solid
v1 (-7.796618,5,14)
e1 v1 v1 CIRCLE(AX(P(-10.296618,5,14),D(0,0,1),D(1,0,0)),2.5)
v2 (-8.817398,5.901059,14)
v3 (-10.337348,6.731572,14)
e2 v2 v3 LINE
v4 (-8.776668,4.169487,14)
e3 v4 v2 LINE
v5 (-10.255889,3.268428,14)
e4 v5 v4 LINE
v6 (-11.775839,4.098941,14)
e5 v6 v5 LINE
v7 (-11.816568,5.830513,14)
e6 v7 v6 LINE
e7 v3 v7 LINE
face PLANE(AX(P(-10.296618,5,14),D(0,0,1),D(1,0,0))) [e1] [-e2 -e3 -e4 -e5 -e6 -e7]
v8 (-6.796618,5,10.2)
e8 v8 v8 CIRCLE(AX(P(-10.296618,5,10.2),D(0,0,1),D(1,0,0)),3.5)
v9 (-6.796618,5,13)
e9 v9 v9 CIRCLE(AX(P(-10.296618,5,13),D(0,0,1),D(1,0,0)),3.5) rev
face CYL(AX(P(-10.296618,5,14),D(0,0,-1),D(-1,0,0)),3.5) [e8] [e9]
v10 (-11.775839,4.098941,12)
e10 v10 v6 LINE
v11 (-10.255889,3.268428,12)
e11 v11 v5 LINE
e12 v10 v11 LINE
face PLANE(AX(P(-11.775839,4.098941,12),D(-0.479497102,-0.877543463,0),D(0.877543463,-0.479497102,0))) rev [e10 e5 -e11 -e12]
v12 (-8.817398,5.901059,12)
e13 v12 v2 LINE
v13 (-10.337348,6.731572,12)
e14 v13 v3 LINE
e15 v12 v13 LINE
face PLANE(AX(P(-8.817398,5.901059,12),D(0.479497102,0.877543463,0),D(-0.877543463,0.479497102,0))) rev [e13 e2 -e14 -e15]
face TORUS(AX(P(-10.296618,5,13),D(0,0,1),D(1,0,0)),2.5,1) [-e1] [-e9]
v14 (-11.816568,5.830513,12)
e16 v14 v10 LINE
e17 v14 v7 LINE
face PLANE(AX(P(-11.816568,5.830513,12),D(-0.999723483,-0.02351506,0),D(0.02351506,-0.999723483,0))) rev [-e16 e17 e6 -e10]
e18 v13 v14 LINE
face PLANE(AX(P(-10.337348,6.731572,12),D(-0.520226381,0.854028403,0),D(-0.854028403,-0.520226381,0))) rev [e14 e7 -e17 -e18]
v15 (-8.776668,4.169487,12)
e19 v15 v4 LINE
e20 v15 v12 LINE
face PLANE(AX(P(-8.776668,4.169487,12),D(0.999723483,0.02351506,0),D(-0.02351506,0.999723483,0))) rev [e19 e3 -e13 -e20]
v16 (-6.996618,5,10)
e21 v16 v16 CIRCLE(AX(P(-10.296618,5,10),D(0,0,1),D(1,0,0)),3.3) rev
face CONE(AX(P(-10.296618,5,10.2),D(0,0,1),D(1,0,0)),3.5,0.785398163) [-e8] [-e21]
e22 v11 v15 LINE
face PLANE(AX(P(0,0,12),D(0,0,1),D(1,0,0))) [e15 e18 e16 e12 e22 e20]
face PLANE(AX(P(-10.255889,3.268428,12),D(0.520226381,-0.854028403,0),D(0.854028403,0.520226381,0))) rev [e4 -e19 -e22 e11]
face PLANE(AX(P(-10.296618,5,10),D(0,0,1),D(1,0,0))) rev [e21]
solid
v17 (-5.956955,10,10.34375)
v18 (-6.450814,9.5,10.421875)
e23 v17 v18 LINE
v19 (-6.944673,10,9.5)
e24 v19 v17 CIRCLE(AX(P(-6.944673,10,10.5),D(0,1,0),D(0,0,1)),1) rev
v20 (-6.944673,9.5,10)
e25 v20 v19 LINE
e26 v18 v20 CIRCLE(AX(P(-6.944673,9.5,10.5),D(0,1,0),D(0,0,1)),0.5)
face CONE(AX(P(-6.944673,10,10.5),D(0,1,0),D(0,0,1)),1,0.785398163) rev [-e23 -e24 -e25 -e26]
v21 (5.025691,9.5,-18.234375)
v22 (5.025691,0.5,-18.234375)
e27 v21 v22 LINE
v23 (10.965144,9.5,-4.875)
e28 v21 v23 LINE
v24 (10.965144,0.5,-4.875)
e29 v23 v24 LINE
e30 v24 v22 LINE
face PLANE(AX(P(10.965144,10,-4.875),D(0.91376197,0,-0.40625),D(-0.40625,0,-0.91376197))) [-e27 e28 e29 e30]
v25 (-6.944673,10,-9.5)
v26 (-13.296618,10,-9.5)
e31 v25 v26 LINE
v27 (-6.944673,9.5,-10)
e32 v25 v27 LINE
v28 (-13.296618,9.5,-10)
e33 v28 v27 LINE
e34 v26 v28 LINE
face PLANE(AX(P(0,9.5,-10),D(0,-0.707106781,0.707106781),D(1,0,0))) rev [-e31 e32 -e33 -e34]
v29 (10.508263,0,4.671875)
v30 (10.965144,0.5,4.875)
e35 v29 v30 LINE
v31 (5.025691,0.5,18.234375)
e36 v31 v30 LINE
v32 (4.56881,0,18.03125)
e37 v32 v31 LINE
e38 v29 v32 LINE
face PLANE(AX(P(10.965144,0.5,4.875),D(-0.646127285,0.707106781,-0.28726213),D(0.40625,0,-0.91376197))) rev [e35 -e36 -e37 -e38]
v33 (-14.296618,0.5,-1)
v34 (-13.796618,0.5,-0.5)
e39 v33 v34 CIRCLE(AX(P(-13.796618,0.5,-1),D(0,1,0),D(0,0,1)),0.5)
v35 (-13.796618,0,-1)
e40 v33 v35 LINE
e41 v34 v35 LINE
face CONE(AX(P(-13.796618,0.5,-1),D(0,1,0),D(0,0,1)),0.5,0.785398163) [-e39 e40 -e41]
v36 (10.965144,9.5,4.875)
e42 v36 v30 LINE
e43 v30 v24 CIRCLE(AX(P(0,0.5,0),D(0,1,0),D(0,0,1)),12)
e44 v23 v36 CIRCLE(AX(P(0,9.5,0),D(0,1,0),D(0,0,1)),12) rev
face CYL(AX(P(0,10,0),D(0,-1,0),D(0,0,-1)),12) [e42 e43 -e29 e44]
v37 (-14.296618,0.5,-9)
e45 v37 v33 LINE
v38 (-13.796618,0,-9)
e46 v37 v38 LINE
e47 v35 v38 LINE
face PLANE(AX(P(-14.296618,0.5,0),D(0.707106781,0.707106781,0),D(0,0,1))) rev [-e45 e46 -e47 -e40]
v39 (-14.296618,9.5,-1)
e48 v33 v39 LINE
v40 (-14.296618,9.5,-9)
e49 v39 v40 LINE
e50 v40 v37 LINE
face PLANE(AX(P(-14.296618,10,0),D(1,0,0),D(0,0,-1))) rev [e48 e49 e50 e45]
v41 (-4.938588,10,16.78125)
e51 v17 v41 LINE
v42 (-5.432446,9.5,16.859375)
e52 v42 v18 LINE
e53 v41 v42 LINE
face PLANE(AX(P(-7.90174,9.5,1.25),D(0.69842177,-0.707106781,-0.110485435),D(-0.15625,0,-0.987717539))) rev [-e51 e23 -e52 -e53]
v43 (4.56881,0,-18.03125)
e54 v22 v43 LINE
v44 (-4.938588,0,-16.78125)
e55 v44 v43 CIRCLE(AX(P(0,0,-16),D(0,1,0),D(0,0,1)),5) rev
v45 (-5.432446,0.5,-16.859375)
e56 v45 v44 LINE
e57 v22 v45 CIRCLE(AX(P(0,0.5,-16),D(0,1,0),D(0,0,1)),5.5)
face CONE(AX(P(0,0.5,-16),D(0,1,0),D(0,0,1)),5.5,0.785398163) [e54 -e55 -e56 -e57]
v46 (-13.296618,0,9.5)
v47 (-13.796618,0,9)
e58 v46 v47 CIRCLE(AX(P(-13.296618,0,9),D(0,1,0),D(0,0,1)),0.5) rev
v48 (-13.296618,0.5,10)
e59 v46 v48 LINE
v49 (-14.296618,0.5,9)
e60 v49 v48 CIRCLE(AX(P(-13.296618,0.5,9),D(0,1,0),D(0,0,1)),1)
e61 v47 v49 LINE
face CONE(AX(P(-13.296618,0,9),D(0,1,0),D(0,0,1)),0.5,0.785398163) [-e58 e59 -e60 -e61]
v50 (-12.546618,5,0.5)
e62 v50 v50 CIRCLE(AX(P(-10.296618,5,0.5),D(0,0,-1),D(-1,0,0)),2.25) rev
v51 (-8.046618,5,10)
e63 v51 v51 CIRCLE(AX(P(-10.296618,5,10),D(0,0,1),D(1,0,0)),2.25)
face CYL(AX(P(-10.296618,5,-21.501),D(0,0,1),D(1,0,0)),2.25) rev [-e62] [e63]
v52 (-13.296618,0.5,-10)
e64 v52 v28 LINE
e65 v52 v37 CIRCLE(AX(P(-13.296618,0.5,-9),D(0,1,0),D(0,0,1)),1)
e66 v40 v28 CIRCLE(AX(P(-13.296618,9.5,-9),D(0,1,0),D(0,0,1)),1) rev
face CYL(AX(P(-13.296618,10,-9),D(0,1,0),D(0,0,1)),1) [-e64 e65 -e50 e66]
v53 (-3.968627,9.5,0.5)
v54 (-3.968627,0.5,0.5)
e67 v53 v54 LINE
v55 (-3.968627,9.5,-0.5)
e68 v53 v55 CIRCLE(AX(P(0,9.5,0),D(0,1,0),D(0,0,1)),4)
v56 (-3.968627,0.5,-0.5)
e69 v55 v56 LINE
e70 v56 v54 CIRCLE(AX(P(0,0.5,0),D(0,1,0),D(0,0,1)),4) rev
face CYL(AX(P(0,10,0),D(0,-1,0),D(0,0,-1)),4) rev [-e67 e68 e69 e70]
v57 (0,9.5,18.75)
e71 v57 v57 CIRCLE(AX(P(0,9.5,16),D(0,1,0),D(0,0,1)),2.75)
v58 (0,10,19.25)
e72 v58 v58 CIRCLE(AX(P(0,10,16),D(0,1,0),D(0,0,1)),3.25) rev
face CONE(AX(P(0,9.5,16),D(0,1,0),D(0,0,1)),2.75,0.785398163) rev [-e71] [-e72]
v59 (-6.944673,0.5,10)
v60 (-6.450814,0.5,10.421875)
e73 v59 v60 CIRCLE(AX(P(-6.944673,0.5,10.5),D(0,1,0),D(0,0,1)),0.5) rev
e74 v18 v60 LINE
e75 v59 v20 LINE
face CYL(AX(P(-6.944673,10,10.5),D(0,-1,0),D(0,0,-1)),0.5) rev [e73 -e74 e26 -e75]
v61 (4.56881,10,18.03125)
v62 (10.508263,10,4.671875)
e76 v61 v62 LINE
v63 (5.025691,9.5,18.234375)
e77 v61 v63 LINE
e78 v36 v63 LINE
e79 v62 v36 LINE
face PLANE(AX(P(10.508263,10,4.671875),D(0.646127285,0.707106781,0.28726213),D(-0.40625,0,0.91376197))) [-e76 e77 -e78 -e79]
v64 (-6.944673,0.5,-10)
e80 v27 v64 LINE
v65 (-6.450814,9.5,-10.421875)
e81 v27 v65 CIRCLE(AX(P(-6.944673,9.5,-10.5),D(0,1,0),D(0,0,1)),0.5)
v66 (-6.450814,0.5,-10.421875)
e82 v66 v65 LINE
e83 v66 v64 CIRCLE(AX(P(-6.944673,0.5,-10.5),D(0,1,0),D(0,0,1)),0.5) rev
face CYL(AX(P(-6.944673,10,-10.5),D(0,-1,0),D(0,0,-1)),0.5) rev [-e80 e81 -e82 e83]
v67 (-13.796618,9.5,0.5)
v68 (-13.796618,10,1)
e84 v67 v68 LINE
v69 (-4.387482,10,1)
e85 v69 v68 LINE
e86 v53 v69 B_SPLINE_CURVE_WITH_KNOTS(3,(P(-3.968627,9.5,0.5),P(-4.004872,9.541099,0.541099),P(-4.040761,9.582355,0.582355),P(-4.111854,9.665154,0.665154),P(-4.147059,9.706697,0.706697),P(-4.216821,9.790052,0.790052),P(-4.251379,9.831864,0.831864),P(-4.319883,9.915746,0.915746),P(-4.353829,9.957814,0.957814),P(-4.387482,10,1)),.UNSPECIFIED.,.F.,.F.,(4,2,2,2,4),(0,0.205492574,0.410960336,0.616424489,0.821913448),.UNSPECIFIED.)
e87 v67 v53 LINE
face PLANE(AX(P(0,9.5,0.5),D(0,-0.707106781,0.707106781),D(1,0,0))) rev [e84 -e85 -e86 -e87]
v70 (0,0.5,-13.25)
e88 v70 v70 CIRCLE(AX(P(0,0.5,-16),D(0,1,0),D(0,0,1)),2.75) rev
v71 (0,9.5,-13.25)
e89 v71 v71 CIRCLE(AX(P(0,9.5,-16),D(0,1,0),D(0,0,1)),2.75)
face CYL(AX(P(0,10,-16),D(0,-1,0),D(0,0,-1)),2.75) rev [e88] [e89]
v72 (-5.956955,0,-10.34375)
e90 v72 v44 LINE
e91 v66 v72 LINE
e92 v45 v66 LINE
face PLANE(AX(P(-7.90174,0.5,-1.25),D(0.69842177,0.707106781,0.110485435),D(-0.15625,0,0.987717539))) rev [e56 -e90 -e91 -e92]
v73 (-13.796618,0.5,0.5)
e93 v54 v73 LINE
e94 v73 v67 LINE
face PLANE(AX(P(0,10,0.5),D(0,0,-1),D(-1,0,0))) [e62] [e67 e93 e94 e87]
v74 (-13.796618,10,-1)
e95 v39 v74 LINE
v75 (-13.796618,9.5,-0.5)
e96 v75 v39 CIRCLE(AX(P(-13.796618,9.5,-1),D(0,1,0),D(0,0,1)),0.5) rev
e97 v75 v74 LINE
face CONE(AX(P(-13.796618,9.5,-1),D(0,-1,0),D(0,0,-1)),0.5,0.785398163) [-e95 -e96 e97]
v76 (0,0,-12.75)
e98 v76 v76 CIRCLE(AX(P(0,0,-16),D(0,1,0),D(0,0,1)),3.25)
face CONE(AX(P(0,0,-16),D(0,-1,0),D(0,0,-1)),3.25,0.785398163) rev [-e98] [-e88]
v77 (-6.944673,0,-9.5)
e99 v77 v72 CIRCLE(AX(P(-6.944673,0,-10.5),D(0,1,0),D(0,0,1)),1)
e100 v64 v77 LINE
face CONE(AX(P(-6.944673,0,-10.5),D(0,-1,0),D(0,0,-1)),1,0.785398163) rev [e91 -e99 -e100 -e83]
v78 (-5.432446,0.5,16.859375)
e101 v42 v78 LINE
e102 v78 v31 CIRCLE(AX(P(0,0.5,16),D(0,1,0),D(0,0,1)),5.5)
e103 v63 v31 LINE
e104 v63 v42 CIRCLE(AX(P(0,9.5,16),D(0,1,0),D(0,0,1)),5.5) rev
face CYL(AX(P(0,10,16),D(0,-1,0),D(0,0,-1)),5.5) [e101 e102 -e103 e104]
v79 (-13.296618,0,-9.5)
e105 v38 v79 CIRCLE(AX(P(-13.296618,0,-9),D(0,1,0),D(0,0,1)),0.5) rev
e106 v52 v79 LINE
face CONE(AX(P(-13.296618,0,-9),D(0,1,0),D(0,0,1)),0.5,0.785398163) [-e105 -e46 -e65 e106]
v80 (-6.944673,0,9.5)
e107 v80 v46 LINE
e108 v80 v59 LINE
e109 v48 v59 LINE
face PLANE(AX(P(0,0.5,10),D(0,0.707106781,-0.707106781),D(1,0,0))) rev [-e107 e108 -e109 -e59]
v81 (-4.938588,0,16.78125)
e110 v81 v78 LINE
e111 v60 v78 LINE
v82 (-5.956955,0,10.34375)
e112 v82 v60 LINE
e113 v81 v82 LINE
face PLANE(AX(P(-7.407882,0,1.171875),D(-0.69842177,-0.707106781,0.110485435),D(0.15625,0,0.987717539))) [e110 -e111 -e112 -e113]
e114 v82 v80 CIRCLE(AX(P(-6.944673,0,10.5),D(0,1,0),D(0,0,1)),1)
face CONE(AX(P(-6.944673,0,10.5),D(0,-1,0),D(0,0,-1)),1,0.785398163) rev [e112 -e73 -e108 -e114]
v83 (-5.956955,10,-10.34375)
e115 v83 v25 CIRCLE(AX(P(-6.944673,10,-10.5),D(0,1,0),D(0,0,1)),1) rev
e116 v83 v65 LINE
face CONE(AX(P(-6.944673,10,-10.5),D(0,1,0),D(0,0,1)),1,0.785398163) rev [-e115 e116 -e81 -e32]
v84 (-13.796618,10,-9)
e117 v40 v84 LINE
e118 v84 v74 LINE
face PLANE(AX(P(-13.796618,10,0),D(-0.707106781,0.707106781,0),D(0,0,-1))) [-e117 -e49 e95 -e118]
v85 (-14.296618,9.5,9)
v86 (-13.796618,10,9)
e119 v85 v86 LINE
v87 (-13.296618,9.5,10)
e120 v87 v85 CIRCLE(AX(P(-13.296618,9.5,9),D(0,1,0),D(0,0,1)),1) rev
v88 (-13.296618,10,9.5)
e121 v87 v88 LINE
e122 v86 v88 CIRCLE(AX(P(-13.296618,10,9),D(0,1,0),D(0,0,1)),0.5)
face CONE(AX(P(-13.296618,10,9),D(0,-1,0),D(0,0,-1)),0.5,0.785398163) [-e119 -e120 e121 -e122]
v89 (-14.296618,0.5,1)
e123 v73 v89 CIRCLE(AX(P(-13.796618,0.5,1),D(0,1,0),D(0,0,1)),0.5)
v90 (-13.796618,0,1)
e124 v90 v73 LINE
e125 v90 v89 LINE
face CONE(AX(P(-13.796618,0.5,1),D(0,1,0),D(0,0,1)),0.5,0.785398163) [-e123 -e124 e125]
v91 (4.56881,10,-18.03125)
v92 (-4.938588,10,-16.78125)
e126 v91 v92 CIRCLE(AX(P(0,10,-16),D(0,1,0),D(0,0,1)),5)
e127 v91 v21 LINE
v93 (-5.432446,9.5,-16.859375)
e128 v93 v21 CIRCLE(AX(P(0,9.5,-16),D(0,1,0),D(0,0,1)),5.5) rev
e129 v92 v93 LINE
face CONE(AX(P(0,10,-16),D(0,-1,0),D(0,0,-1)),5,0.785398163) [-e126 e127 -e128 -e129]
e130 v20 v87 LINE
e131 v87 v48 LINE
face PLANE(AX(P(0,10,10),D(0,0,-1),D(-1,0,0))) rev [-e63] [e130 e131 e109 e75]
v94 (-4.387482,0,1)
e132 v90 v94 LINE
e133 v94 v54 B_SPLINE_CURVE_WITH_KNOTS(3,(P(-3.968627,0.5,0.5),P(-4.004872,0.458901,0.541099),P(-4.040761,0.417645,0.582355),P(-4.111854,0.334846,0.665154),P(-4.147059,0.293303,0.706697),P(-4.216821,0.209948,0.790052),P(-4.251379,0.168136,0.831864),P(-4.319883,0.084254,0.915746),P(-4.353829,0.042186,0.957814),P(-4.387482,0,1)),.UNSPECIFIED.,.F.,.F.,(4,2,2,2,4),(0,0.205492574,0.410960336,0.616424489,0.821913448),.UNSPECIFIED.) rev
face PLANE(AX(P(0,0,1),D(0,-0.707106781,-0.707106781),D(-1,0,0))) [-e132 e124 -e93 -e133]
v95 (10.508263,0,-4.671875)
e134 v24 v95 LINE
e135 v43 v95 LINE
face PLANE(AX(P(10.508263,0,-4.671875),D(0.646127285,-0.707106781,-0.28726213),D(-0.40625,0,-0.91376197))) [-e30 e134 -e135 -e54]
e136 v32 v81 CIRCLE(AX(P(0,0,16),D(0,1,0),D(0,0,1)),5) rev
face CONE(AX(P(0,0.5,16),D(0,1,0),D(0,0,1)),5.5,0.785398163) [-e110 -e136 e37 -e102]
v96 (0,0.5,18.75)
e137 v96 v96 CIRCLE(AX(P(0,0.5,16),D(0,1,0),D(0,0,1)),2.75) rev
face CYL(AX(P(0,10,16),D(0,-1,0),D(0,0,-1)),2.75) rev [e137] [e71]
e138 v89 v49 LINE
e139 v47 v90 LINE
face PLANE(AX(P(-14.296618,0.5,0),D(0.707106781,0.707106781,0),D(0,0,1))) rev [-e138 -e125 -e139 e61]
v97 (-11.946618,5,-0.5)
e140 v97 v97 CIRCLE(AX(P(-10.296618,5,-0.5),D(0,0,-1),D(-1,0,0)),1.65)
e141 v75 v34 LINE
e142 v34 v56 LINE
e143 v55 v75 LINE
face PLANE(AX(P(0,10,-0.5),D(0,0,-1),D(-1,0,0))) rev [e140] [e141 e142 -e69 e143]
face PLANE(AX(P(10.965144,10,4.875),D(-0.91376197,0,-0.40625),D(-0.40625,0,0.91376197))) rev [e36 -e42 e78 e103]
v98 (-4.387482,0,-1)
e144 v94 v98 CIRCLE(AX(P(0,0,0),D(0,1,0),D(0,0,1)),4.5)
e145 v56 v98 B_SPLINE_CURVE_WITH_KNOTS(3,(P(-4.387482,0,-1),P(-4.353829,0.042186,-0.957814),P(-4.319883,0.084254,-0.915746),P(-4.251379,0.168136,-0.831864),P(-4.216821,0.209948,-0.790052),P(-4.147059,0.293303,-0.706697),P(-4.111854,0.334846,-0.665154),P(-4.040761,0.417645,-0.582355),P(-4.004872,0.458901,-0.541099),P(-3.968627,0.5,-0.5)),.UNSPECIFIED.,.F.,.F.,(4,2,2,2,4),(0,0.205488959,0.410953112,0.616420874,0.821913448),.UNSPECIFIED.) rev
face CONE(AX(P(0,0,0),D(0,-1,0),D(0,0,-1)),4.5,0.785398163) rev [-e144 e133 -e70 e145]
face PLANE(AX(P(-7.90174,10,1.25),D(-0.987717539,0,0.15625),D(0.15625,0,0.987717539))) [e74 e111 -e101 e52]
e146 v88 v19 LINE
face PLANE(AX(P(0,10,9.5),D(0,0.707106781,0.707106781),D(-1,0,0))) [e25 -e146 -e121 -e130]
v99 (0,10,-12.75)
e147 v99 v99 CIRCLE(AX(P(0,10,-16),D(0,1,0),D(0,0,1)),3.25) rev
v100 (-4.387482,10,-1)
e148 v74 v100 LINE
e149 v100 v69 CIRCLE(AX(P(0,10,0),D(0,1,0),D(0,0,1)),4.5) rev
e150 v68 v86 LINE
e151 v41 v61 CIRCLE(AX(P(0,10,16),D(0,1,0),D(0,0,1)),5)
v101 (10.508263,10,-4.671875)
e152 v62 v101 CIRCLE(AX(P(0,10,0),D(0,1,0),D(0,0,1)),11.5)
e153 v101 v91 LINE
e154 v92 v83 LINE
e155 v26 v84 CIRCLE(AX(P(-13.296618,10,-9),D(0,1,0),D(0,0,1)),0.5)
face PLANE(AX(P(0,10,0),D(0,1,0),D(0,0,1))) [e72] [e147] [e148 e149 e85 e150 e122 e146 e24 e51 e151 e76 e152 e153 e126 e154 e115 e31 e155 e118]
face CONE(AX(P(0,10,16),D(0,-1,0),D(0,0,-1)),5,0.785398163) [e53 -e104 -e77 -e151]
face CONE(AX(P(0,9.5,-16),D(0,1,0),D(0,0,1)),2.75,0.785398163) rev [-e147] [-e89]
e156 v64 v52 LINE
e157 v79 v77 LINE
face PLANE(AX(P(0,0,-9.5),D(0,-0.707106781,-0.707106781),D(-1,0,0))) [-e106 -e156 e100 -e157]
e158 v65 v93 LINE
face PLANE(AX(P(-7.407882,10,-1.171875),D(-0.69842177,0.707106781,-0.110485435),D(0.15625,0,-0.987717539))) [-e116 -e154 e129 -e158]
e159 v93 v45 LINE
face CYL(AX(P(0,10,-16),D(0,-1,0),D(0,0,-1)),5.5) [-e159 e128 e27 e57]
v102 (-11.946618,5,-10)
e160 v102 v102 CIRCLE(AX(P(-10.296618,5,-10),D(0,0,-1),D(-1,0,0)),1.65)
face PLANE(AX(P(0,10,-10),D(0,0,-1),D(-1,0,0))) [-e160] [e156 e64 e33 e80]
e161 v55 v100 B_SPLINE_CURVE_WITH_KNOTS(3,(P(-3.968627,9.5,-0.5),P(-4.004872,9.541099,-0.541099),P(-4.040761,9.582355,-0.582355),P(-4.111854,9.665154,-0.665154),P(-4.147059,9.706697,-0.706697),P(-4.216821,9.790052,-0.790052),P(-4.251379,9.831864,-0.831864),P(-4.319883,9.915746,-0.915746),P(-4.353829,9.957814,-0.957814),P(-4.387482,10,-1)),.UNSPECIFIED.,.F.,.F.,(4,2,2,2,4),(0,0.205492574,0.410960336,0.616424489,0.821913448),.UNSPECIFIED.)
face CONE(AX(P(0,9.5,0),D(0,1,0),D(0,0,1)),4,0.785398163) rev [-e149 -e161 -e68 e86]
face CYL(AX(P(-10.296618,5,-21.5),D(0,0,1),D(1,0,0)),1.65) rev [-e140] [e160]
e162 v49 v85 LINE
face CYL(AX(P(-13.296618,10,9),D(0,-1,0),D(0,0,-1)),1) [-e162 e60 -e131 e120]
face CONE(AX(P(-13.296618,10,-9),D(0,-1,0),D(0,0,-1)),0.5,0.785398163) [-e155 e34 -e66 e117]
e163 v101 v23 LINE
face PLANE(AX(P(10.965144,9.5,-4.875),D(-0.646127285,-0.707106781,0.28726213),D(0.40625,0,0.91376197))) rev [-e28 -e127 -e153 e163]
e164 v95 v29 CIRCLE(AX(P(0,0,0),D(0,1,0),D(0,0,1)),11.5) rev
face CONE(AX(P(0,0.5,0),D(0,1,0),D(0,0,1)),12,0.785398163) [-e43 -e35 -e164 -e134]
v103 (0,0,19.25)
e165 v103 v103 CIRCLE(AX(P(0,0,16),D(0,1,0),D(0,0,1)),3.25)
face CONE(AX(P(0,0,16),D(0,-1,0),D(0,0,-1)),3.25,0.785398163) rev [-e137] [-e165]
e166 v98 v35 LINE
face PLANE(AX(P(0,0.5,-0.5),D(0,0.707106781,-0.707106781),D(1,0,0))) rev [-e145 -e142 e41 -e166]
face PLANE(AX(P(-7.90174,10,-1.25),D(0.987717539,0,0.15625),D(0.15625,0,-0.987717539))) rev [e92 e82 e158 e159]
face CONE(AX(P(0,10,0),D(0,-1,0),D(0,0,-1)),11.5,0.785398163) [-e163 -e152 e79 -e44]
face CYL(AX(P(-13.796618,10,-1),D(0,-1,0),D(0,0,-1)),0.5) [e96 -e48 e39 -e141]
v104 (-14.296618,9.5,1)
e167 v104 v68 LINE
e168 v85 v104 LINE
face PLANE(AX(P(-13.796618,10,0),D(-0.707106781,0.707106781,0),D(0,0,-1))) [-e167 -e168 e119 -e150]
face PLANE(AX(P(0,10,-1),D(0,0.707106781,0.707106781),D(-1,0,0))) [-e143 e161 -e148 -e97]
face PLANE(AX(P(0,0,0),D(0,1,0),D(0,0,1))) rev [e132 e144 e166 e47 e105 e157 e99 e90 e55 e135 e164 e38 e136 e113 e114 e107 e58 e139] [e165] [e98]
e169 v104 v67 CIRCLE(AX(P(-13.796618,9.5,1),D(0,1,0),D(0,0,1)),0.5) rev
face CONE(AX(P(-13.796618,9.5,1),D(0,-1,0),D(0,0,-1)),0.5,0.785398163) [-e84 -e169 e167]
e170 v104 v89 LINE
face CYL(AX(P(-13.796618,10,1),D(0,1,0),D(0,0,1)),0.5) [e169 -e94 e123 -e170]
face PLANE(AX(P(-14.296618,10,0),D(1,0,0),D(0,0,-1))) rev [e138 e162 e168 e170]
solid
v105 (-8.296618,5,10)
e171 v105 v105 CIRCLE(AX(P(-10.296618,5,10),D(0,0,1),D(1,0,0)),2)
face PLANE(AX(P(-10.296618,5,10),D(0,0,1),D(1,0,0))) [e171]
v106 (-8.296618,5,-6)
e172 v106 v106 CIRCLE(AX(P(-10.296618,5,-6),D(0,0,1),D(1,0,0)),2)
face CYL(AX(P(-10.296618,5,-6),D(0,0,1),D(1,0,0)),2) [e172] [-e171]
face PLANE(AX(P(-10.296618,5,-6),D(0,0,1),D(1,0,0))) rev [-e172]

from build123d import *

# Parameters (mm, degrees)
SKETCH_1_R          = 2.75
EXTRUDE_1_DEPTH     = 10
CUT_EXTRUDE_1_REACH = 38.009
SKETCH_3_R          = 2.25
SKETCH_3_3_R        = 1.65
CUT_EXTRUDE_2_DEPTH = 37.00893353
FILLET_1_R          = 1
FILLET_2_R          = 0.5
CHAMFER_1_SIZE      = 0.5
SKETCH_4_R          = 3.5
EXTRUDE_2_DEPTH     = 4
FILLET_3_R          = 1
CUT_EXTRUDE_3_DEPTH = 2
CHAMFER_2_SIZE      = 0.2
SKETCH_6_R          = 2
EXTRUDE_3_DEPTH     = 16


with BuildPart() as part:
    # 草图1 → 凸台-拉伸1 (new body)
    with BuildSketch(Plane(origin=(0, 0, 0), x_dir=(1, 0, 0), z_dir=(0, 1, 0))):
        with BuildLine():
            ThreePointArc((5.025690834, 18.234375), (-0.716951035, 21.453070806), (-5.432446466, 16.859375))
            Line((-5.432446466, 16.859375), (-6.517551571, 10))
            Line((-6.517551571, 10), (-14.296618271, 10))
            Line((-14.296618271, 10), (-14.296618271, 0.5))
            Line((-14.296618271, 0.5), (-3.968626967, 0.5))
            ThreePointArc((-3.968626967, 0.5), (4, 0), (-3.968626967, -0.5))
            Line((-3.968626967, -0.5), (-14.296618271, -0.5))
            Line((-14.296618271, -0.5), (-14.296618271, -10))
            Line((-14.296618271, -10), (-6.517551571, -10))
            Line((-6.517551571, -10), (-5.432446466, -16.859375))
            ThreePointArc((-5.432446466, -16.859375), (-0.716951035, -21.453070806), (5.025690834, -18.234375))
            Line((5.025690834, -18.234375), (10.965143638, -4.875))
            ThreePointArc((10.965143638, -4.875), (12, 0), (10.965143638, 4.875))
            Line((10.965143638, 4.875), (5.025690834, 18.234375))
        make_face()
        with Locations(Location((0, -16, 0), (0, 0, 270))):
            Circle(SKETCH_1_R, mode=Mode.SUBTRACT)
        with Locations(Location((0, 16, 0), (0, 0, 270))):
            Circle(SKETCH_1_R, mode=Mode.SUBTRACT)
    extrude(amount=EXTRUDE_1_DEPTH)

    # 草图3 → 切除-拉伸1 (cut, up to next)
    with BuildSketch(Plane.XY.offset(10), mode=Mode.PRIVATE) as cut_extrude_1_sk1:
        with Locations((-10.296618271, 5)):
            Circle(SKETCH_3_R)
    cut_extrude_1_tool1 = extrude(cut_extrude_1_sk1.sketch, amount=-CUT_EXTRUDE_1_REACH, mode=Mode.PRIVATE) & part.part
    add(cut_extrude_1_tool1.solids().sort_by_distance((-10.296618, 5, 10))[0], mode=Mode.SUBTRACT)

    # 草图3<3> → 切除-拉伸2 (cut, through all)
    with BuildSketch(Plane.XY.offset(10)):
        with Locations(Location((-10.296618271, 5, 0), (0, 0, 180))):
            Circle(SKETCH_3_3_R)
    extrude(amount=-CUT_EXTRUDE_2_DEPTH, mode=Mode.SUBTRACT)

    # 圆角1
    fillet_1_edges = [part.edges().sort_by_distance(p)[0] for p in [
        (-14.296618271, 5, 10),
        (-14.296618271, 5, -10),
    ]]
    fillet(fillet_1_edges, radius=FILLET_1_R)

    # 圆角2
    fillet_2_edges = [part.edges().sort_by_distance(p)[0] for p in [
        (-6.517551571, 5, 10),
        (-14.296618271, 5, 0.5),
        (-14.296618271, 5, -0.5),
        (-6.517551571, 5, -10),
    ]]
    fillet(fillet_2_edges, radius=FILLET_2_R)

    # 倒角1
    chamfer_1_edges = [part.edges().sort_by_distance(p)[0] for p in [
        (-6.619913143, 0, 10.119827342),
        (-6.619913143, 10, 10.119827342),
        (-6.619913143, 0, -10.119827342),
        (-6.619913143, 10, -10.119827342),
        (-0.716951035, 10, 21.453070806),
        (7.995417236, 10, 11.5546875),
        (0, 0, 13.25),
        (0, 0, -18.75),
        (4, 0, 0),
        (12, 10, 0),
        (-5.941630183, 0, -13.640625),
        (-0.716951035, 0, -21.453070806),
        (7.995417236, 0, -11.5546875),
        (12, 0, 0),
        (7.995417236, 0, 11.5546875),
        (-0.716951035, 0, 21.453070806),
        (-5.941630183, 0, 13.640625),
        (7.995417236, 10, -11.5546875),
        (-0.716951035, 10, -21.453070806),
        (-5.941630183, 10, -13.640625),
        (4, 10, 0),
        (-14.296618271, 0, -5),
        (-14.296618271, 10, -5),
        (-10.12064547, 0, 10),
        (-10.12064547, 0, -10),
        (-14.003725052, 0, 9.707106781),
        (-14.003725052, 0, -9.707106781),
        (-10.12064547, 10, -10),
        (-5.941630183, 10, 13.640625),
        (-10.12064547, 10, 10),
        (-14.003725052, 10, 9.707106781),
        (-14.003725052, 10, -9.707106781),
        (0, 10, -18.75),
        (-8.882622619, 0, -0.5),
        (-8.882622619, 10, -0.5),
        (0, 10, 13.25),
        (-14.296618271, 0, 5),
        (-8.882622619, 0, 0.5),
        (-14.150171662, 0, 0.646446609),
        (-14.150171662, 0, -0.646446609),
        (-8.882622619, 10, 0.5),
        (-14.296618271, 10, 5),
        (-14.150171662, 10, 0.646446609),
        (-14.150171662, 10, -0.646446609),
    ]]
    chamfer(chamfer_1_edges, length=CHAMFER_1_SIZE - 0.0001)  # a hair under: the kernel refuses the full size


with BuildPart() as body_2:
    # 草图4 → 凸台-拉伸2 (new body)
    with BuildSketch(Plane.XY.offset(10)):
        with Locations((-10.296618271, 5)):
            Circle(SKETCH_4_R)
    extrude(amount=EXTRUDE_2_DEPTH)

    # 圆角3
    fillet_3_edges = [body_2.edges().sort_by_distance(p)[0] for p in [
        (-13.796618271, 5, 14),
    ]]
    fillet(fillet_3_edges, radius=FILLET_3_R)

    # 草图5 → 切除-拉伸3 (cut)
    with BuildSketch(Plane.XY.offset(14)):
        Polygon((-8.817397687, 5.901058523), (-10.33734755, 6.731571866), (-11.816568135, 5.830513342), (-11.775838856, 4.098941477), (-10.255888992, 3.268428134), (-8.776668408, 4.169486658), align=None)
    extrude(amount=-CUT_EXTRUDE_3_DEPTH, mode=Mode.SUBTRACT)

    # 倒角2
    chamfer_2_edges = [body_2.edges().sort_by_distance(p)[0] for p in [
        (-13.796618271, 5, 10),
    ]]
    chamfer(chamfer_2_edges, length=CHAMFER_2_SIZE)


with BuildPart() as body_3:
    # 草图6 → 凸台-拉伸3 (new body)
    with BuildSketch(Plane.XY.offset(10)):
        with Locations((-10.296618271, 5)):
            Circle(SKETCH_6_R)
    extrude(amount=-EXTRUDE_3_DEPTH)


solid = Compound([part.part, body_2.part, body_3.part])
